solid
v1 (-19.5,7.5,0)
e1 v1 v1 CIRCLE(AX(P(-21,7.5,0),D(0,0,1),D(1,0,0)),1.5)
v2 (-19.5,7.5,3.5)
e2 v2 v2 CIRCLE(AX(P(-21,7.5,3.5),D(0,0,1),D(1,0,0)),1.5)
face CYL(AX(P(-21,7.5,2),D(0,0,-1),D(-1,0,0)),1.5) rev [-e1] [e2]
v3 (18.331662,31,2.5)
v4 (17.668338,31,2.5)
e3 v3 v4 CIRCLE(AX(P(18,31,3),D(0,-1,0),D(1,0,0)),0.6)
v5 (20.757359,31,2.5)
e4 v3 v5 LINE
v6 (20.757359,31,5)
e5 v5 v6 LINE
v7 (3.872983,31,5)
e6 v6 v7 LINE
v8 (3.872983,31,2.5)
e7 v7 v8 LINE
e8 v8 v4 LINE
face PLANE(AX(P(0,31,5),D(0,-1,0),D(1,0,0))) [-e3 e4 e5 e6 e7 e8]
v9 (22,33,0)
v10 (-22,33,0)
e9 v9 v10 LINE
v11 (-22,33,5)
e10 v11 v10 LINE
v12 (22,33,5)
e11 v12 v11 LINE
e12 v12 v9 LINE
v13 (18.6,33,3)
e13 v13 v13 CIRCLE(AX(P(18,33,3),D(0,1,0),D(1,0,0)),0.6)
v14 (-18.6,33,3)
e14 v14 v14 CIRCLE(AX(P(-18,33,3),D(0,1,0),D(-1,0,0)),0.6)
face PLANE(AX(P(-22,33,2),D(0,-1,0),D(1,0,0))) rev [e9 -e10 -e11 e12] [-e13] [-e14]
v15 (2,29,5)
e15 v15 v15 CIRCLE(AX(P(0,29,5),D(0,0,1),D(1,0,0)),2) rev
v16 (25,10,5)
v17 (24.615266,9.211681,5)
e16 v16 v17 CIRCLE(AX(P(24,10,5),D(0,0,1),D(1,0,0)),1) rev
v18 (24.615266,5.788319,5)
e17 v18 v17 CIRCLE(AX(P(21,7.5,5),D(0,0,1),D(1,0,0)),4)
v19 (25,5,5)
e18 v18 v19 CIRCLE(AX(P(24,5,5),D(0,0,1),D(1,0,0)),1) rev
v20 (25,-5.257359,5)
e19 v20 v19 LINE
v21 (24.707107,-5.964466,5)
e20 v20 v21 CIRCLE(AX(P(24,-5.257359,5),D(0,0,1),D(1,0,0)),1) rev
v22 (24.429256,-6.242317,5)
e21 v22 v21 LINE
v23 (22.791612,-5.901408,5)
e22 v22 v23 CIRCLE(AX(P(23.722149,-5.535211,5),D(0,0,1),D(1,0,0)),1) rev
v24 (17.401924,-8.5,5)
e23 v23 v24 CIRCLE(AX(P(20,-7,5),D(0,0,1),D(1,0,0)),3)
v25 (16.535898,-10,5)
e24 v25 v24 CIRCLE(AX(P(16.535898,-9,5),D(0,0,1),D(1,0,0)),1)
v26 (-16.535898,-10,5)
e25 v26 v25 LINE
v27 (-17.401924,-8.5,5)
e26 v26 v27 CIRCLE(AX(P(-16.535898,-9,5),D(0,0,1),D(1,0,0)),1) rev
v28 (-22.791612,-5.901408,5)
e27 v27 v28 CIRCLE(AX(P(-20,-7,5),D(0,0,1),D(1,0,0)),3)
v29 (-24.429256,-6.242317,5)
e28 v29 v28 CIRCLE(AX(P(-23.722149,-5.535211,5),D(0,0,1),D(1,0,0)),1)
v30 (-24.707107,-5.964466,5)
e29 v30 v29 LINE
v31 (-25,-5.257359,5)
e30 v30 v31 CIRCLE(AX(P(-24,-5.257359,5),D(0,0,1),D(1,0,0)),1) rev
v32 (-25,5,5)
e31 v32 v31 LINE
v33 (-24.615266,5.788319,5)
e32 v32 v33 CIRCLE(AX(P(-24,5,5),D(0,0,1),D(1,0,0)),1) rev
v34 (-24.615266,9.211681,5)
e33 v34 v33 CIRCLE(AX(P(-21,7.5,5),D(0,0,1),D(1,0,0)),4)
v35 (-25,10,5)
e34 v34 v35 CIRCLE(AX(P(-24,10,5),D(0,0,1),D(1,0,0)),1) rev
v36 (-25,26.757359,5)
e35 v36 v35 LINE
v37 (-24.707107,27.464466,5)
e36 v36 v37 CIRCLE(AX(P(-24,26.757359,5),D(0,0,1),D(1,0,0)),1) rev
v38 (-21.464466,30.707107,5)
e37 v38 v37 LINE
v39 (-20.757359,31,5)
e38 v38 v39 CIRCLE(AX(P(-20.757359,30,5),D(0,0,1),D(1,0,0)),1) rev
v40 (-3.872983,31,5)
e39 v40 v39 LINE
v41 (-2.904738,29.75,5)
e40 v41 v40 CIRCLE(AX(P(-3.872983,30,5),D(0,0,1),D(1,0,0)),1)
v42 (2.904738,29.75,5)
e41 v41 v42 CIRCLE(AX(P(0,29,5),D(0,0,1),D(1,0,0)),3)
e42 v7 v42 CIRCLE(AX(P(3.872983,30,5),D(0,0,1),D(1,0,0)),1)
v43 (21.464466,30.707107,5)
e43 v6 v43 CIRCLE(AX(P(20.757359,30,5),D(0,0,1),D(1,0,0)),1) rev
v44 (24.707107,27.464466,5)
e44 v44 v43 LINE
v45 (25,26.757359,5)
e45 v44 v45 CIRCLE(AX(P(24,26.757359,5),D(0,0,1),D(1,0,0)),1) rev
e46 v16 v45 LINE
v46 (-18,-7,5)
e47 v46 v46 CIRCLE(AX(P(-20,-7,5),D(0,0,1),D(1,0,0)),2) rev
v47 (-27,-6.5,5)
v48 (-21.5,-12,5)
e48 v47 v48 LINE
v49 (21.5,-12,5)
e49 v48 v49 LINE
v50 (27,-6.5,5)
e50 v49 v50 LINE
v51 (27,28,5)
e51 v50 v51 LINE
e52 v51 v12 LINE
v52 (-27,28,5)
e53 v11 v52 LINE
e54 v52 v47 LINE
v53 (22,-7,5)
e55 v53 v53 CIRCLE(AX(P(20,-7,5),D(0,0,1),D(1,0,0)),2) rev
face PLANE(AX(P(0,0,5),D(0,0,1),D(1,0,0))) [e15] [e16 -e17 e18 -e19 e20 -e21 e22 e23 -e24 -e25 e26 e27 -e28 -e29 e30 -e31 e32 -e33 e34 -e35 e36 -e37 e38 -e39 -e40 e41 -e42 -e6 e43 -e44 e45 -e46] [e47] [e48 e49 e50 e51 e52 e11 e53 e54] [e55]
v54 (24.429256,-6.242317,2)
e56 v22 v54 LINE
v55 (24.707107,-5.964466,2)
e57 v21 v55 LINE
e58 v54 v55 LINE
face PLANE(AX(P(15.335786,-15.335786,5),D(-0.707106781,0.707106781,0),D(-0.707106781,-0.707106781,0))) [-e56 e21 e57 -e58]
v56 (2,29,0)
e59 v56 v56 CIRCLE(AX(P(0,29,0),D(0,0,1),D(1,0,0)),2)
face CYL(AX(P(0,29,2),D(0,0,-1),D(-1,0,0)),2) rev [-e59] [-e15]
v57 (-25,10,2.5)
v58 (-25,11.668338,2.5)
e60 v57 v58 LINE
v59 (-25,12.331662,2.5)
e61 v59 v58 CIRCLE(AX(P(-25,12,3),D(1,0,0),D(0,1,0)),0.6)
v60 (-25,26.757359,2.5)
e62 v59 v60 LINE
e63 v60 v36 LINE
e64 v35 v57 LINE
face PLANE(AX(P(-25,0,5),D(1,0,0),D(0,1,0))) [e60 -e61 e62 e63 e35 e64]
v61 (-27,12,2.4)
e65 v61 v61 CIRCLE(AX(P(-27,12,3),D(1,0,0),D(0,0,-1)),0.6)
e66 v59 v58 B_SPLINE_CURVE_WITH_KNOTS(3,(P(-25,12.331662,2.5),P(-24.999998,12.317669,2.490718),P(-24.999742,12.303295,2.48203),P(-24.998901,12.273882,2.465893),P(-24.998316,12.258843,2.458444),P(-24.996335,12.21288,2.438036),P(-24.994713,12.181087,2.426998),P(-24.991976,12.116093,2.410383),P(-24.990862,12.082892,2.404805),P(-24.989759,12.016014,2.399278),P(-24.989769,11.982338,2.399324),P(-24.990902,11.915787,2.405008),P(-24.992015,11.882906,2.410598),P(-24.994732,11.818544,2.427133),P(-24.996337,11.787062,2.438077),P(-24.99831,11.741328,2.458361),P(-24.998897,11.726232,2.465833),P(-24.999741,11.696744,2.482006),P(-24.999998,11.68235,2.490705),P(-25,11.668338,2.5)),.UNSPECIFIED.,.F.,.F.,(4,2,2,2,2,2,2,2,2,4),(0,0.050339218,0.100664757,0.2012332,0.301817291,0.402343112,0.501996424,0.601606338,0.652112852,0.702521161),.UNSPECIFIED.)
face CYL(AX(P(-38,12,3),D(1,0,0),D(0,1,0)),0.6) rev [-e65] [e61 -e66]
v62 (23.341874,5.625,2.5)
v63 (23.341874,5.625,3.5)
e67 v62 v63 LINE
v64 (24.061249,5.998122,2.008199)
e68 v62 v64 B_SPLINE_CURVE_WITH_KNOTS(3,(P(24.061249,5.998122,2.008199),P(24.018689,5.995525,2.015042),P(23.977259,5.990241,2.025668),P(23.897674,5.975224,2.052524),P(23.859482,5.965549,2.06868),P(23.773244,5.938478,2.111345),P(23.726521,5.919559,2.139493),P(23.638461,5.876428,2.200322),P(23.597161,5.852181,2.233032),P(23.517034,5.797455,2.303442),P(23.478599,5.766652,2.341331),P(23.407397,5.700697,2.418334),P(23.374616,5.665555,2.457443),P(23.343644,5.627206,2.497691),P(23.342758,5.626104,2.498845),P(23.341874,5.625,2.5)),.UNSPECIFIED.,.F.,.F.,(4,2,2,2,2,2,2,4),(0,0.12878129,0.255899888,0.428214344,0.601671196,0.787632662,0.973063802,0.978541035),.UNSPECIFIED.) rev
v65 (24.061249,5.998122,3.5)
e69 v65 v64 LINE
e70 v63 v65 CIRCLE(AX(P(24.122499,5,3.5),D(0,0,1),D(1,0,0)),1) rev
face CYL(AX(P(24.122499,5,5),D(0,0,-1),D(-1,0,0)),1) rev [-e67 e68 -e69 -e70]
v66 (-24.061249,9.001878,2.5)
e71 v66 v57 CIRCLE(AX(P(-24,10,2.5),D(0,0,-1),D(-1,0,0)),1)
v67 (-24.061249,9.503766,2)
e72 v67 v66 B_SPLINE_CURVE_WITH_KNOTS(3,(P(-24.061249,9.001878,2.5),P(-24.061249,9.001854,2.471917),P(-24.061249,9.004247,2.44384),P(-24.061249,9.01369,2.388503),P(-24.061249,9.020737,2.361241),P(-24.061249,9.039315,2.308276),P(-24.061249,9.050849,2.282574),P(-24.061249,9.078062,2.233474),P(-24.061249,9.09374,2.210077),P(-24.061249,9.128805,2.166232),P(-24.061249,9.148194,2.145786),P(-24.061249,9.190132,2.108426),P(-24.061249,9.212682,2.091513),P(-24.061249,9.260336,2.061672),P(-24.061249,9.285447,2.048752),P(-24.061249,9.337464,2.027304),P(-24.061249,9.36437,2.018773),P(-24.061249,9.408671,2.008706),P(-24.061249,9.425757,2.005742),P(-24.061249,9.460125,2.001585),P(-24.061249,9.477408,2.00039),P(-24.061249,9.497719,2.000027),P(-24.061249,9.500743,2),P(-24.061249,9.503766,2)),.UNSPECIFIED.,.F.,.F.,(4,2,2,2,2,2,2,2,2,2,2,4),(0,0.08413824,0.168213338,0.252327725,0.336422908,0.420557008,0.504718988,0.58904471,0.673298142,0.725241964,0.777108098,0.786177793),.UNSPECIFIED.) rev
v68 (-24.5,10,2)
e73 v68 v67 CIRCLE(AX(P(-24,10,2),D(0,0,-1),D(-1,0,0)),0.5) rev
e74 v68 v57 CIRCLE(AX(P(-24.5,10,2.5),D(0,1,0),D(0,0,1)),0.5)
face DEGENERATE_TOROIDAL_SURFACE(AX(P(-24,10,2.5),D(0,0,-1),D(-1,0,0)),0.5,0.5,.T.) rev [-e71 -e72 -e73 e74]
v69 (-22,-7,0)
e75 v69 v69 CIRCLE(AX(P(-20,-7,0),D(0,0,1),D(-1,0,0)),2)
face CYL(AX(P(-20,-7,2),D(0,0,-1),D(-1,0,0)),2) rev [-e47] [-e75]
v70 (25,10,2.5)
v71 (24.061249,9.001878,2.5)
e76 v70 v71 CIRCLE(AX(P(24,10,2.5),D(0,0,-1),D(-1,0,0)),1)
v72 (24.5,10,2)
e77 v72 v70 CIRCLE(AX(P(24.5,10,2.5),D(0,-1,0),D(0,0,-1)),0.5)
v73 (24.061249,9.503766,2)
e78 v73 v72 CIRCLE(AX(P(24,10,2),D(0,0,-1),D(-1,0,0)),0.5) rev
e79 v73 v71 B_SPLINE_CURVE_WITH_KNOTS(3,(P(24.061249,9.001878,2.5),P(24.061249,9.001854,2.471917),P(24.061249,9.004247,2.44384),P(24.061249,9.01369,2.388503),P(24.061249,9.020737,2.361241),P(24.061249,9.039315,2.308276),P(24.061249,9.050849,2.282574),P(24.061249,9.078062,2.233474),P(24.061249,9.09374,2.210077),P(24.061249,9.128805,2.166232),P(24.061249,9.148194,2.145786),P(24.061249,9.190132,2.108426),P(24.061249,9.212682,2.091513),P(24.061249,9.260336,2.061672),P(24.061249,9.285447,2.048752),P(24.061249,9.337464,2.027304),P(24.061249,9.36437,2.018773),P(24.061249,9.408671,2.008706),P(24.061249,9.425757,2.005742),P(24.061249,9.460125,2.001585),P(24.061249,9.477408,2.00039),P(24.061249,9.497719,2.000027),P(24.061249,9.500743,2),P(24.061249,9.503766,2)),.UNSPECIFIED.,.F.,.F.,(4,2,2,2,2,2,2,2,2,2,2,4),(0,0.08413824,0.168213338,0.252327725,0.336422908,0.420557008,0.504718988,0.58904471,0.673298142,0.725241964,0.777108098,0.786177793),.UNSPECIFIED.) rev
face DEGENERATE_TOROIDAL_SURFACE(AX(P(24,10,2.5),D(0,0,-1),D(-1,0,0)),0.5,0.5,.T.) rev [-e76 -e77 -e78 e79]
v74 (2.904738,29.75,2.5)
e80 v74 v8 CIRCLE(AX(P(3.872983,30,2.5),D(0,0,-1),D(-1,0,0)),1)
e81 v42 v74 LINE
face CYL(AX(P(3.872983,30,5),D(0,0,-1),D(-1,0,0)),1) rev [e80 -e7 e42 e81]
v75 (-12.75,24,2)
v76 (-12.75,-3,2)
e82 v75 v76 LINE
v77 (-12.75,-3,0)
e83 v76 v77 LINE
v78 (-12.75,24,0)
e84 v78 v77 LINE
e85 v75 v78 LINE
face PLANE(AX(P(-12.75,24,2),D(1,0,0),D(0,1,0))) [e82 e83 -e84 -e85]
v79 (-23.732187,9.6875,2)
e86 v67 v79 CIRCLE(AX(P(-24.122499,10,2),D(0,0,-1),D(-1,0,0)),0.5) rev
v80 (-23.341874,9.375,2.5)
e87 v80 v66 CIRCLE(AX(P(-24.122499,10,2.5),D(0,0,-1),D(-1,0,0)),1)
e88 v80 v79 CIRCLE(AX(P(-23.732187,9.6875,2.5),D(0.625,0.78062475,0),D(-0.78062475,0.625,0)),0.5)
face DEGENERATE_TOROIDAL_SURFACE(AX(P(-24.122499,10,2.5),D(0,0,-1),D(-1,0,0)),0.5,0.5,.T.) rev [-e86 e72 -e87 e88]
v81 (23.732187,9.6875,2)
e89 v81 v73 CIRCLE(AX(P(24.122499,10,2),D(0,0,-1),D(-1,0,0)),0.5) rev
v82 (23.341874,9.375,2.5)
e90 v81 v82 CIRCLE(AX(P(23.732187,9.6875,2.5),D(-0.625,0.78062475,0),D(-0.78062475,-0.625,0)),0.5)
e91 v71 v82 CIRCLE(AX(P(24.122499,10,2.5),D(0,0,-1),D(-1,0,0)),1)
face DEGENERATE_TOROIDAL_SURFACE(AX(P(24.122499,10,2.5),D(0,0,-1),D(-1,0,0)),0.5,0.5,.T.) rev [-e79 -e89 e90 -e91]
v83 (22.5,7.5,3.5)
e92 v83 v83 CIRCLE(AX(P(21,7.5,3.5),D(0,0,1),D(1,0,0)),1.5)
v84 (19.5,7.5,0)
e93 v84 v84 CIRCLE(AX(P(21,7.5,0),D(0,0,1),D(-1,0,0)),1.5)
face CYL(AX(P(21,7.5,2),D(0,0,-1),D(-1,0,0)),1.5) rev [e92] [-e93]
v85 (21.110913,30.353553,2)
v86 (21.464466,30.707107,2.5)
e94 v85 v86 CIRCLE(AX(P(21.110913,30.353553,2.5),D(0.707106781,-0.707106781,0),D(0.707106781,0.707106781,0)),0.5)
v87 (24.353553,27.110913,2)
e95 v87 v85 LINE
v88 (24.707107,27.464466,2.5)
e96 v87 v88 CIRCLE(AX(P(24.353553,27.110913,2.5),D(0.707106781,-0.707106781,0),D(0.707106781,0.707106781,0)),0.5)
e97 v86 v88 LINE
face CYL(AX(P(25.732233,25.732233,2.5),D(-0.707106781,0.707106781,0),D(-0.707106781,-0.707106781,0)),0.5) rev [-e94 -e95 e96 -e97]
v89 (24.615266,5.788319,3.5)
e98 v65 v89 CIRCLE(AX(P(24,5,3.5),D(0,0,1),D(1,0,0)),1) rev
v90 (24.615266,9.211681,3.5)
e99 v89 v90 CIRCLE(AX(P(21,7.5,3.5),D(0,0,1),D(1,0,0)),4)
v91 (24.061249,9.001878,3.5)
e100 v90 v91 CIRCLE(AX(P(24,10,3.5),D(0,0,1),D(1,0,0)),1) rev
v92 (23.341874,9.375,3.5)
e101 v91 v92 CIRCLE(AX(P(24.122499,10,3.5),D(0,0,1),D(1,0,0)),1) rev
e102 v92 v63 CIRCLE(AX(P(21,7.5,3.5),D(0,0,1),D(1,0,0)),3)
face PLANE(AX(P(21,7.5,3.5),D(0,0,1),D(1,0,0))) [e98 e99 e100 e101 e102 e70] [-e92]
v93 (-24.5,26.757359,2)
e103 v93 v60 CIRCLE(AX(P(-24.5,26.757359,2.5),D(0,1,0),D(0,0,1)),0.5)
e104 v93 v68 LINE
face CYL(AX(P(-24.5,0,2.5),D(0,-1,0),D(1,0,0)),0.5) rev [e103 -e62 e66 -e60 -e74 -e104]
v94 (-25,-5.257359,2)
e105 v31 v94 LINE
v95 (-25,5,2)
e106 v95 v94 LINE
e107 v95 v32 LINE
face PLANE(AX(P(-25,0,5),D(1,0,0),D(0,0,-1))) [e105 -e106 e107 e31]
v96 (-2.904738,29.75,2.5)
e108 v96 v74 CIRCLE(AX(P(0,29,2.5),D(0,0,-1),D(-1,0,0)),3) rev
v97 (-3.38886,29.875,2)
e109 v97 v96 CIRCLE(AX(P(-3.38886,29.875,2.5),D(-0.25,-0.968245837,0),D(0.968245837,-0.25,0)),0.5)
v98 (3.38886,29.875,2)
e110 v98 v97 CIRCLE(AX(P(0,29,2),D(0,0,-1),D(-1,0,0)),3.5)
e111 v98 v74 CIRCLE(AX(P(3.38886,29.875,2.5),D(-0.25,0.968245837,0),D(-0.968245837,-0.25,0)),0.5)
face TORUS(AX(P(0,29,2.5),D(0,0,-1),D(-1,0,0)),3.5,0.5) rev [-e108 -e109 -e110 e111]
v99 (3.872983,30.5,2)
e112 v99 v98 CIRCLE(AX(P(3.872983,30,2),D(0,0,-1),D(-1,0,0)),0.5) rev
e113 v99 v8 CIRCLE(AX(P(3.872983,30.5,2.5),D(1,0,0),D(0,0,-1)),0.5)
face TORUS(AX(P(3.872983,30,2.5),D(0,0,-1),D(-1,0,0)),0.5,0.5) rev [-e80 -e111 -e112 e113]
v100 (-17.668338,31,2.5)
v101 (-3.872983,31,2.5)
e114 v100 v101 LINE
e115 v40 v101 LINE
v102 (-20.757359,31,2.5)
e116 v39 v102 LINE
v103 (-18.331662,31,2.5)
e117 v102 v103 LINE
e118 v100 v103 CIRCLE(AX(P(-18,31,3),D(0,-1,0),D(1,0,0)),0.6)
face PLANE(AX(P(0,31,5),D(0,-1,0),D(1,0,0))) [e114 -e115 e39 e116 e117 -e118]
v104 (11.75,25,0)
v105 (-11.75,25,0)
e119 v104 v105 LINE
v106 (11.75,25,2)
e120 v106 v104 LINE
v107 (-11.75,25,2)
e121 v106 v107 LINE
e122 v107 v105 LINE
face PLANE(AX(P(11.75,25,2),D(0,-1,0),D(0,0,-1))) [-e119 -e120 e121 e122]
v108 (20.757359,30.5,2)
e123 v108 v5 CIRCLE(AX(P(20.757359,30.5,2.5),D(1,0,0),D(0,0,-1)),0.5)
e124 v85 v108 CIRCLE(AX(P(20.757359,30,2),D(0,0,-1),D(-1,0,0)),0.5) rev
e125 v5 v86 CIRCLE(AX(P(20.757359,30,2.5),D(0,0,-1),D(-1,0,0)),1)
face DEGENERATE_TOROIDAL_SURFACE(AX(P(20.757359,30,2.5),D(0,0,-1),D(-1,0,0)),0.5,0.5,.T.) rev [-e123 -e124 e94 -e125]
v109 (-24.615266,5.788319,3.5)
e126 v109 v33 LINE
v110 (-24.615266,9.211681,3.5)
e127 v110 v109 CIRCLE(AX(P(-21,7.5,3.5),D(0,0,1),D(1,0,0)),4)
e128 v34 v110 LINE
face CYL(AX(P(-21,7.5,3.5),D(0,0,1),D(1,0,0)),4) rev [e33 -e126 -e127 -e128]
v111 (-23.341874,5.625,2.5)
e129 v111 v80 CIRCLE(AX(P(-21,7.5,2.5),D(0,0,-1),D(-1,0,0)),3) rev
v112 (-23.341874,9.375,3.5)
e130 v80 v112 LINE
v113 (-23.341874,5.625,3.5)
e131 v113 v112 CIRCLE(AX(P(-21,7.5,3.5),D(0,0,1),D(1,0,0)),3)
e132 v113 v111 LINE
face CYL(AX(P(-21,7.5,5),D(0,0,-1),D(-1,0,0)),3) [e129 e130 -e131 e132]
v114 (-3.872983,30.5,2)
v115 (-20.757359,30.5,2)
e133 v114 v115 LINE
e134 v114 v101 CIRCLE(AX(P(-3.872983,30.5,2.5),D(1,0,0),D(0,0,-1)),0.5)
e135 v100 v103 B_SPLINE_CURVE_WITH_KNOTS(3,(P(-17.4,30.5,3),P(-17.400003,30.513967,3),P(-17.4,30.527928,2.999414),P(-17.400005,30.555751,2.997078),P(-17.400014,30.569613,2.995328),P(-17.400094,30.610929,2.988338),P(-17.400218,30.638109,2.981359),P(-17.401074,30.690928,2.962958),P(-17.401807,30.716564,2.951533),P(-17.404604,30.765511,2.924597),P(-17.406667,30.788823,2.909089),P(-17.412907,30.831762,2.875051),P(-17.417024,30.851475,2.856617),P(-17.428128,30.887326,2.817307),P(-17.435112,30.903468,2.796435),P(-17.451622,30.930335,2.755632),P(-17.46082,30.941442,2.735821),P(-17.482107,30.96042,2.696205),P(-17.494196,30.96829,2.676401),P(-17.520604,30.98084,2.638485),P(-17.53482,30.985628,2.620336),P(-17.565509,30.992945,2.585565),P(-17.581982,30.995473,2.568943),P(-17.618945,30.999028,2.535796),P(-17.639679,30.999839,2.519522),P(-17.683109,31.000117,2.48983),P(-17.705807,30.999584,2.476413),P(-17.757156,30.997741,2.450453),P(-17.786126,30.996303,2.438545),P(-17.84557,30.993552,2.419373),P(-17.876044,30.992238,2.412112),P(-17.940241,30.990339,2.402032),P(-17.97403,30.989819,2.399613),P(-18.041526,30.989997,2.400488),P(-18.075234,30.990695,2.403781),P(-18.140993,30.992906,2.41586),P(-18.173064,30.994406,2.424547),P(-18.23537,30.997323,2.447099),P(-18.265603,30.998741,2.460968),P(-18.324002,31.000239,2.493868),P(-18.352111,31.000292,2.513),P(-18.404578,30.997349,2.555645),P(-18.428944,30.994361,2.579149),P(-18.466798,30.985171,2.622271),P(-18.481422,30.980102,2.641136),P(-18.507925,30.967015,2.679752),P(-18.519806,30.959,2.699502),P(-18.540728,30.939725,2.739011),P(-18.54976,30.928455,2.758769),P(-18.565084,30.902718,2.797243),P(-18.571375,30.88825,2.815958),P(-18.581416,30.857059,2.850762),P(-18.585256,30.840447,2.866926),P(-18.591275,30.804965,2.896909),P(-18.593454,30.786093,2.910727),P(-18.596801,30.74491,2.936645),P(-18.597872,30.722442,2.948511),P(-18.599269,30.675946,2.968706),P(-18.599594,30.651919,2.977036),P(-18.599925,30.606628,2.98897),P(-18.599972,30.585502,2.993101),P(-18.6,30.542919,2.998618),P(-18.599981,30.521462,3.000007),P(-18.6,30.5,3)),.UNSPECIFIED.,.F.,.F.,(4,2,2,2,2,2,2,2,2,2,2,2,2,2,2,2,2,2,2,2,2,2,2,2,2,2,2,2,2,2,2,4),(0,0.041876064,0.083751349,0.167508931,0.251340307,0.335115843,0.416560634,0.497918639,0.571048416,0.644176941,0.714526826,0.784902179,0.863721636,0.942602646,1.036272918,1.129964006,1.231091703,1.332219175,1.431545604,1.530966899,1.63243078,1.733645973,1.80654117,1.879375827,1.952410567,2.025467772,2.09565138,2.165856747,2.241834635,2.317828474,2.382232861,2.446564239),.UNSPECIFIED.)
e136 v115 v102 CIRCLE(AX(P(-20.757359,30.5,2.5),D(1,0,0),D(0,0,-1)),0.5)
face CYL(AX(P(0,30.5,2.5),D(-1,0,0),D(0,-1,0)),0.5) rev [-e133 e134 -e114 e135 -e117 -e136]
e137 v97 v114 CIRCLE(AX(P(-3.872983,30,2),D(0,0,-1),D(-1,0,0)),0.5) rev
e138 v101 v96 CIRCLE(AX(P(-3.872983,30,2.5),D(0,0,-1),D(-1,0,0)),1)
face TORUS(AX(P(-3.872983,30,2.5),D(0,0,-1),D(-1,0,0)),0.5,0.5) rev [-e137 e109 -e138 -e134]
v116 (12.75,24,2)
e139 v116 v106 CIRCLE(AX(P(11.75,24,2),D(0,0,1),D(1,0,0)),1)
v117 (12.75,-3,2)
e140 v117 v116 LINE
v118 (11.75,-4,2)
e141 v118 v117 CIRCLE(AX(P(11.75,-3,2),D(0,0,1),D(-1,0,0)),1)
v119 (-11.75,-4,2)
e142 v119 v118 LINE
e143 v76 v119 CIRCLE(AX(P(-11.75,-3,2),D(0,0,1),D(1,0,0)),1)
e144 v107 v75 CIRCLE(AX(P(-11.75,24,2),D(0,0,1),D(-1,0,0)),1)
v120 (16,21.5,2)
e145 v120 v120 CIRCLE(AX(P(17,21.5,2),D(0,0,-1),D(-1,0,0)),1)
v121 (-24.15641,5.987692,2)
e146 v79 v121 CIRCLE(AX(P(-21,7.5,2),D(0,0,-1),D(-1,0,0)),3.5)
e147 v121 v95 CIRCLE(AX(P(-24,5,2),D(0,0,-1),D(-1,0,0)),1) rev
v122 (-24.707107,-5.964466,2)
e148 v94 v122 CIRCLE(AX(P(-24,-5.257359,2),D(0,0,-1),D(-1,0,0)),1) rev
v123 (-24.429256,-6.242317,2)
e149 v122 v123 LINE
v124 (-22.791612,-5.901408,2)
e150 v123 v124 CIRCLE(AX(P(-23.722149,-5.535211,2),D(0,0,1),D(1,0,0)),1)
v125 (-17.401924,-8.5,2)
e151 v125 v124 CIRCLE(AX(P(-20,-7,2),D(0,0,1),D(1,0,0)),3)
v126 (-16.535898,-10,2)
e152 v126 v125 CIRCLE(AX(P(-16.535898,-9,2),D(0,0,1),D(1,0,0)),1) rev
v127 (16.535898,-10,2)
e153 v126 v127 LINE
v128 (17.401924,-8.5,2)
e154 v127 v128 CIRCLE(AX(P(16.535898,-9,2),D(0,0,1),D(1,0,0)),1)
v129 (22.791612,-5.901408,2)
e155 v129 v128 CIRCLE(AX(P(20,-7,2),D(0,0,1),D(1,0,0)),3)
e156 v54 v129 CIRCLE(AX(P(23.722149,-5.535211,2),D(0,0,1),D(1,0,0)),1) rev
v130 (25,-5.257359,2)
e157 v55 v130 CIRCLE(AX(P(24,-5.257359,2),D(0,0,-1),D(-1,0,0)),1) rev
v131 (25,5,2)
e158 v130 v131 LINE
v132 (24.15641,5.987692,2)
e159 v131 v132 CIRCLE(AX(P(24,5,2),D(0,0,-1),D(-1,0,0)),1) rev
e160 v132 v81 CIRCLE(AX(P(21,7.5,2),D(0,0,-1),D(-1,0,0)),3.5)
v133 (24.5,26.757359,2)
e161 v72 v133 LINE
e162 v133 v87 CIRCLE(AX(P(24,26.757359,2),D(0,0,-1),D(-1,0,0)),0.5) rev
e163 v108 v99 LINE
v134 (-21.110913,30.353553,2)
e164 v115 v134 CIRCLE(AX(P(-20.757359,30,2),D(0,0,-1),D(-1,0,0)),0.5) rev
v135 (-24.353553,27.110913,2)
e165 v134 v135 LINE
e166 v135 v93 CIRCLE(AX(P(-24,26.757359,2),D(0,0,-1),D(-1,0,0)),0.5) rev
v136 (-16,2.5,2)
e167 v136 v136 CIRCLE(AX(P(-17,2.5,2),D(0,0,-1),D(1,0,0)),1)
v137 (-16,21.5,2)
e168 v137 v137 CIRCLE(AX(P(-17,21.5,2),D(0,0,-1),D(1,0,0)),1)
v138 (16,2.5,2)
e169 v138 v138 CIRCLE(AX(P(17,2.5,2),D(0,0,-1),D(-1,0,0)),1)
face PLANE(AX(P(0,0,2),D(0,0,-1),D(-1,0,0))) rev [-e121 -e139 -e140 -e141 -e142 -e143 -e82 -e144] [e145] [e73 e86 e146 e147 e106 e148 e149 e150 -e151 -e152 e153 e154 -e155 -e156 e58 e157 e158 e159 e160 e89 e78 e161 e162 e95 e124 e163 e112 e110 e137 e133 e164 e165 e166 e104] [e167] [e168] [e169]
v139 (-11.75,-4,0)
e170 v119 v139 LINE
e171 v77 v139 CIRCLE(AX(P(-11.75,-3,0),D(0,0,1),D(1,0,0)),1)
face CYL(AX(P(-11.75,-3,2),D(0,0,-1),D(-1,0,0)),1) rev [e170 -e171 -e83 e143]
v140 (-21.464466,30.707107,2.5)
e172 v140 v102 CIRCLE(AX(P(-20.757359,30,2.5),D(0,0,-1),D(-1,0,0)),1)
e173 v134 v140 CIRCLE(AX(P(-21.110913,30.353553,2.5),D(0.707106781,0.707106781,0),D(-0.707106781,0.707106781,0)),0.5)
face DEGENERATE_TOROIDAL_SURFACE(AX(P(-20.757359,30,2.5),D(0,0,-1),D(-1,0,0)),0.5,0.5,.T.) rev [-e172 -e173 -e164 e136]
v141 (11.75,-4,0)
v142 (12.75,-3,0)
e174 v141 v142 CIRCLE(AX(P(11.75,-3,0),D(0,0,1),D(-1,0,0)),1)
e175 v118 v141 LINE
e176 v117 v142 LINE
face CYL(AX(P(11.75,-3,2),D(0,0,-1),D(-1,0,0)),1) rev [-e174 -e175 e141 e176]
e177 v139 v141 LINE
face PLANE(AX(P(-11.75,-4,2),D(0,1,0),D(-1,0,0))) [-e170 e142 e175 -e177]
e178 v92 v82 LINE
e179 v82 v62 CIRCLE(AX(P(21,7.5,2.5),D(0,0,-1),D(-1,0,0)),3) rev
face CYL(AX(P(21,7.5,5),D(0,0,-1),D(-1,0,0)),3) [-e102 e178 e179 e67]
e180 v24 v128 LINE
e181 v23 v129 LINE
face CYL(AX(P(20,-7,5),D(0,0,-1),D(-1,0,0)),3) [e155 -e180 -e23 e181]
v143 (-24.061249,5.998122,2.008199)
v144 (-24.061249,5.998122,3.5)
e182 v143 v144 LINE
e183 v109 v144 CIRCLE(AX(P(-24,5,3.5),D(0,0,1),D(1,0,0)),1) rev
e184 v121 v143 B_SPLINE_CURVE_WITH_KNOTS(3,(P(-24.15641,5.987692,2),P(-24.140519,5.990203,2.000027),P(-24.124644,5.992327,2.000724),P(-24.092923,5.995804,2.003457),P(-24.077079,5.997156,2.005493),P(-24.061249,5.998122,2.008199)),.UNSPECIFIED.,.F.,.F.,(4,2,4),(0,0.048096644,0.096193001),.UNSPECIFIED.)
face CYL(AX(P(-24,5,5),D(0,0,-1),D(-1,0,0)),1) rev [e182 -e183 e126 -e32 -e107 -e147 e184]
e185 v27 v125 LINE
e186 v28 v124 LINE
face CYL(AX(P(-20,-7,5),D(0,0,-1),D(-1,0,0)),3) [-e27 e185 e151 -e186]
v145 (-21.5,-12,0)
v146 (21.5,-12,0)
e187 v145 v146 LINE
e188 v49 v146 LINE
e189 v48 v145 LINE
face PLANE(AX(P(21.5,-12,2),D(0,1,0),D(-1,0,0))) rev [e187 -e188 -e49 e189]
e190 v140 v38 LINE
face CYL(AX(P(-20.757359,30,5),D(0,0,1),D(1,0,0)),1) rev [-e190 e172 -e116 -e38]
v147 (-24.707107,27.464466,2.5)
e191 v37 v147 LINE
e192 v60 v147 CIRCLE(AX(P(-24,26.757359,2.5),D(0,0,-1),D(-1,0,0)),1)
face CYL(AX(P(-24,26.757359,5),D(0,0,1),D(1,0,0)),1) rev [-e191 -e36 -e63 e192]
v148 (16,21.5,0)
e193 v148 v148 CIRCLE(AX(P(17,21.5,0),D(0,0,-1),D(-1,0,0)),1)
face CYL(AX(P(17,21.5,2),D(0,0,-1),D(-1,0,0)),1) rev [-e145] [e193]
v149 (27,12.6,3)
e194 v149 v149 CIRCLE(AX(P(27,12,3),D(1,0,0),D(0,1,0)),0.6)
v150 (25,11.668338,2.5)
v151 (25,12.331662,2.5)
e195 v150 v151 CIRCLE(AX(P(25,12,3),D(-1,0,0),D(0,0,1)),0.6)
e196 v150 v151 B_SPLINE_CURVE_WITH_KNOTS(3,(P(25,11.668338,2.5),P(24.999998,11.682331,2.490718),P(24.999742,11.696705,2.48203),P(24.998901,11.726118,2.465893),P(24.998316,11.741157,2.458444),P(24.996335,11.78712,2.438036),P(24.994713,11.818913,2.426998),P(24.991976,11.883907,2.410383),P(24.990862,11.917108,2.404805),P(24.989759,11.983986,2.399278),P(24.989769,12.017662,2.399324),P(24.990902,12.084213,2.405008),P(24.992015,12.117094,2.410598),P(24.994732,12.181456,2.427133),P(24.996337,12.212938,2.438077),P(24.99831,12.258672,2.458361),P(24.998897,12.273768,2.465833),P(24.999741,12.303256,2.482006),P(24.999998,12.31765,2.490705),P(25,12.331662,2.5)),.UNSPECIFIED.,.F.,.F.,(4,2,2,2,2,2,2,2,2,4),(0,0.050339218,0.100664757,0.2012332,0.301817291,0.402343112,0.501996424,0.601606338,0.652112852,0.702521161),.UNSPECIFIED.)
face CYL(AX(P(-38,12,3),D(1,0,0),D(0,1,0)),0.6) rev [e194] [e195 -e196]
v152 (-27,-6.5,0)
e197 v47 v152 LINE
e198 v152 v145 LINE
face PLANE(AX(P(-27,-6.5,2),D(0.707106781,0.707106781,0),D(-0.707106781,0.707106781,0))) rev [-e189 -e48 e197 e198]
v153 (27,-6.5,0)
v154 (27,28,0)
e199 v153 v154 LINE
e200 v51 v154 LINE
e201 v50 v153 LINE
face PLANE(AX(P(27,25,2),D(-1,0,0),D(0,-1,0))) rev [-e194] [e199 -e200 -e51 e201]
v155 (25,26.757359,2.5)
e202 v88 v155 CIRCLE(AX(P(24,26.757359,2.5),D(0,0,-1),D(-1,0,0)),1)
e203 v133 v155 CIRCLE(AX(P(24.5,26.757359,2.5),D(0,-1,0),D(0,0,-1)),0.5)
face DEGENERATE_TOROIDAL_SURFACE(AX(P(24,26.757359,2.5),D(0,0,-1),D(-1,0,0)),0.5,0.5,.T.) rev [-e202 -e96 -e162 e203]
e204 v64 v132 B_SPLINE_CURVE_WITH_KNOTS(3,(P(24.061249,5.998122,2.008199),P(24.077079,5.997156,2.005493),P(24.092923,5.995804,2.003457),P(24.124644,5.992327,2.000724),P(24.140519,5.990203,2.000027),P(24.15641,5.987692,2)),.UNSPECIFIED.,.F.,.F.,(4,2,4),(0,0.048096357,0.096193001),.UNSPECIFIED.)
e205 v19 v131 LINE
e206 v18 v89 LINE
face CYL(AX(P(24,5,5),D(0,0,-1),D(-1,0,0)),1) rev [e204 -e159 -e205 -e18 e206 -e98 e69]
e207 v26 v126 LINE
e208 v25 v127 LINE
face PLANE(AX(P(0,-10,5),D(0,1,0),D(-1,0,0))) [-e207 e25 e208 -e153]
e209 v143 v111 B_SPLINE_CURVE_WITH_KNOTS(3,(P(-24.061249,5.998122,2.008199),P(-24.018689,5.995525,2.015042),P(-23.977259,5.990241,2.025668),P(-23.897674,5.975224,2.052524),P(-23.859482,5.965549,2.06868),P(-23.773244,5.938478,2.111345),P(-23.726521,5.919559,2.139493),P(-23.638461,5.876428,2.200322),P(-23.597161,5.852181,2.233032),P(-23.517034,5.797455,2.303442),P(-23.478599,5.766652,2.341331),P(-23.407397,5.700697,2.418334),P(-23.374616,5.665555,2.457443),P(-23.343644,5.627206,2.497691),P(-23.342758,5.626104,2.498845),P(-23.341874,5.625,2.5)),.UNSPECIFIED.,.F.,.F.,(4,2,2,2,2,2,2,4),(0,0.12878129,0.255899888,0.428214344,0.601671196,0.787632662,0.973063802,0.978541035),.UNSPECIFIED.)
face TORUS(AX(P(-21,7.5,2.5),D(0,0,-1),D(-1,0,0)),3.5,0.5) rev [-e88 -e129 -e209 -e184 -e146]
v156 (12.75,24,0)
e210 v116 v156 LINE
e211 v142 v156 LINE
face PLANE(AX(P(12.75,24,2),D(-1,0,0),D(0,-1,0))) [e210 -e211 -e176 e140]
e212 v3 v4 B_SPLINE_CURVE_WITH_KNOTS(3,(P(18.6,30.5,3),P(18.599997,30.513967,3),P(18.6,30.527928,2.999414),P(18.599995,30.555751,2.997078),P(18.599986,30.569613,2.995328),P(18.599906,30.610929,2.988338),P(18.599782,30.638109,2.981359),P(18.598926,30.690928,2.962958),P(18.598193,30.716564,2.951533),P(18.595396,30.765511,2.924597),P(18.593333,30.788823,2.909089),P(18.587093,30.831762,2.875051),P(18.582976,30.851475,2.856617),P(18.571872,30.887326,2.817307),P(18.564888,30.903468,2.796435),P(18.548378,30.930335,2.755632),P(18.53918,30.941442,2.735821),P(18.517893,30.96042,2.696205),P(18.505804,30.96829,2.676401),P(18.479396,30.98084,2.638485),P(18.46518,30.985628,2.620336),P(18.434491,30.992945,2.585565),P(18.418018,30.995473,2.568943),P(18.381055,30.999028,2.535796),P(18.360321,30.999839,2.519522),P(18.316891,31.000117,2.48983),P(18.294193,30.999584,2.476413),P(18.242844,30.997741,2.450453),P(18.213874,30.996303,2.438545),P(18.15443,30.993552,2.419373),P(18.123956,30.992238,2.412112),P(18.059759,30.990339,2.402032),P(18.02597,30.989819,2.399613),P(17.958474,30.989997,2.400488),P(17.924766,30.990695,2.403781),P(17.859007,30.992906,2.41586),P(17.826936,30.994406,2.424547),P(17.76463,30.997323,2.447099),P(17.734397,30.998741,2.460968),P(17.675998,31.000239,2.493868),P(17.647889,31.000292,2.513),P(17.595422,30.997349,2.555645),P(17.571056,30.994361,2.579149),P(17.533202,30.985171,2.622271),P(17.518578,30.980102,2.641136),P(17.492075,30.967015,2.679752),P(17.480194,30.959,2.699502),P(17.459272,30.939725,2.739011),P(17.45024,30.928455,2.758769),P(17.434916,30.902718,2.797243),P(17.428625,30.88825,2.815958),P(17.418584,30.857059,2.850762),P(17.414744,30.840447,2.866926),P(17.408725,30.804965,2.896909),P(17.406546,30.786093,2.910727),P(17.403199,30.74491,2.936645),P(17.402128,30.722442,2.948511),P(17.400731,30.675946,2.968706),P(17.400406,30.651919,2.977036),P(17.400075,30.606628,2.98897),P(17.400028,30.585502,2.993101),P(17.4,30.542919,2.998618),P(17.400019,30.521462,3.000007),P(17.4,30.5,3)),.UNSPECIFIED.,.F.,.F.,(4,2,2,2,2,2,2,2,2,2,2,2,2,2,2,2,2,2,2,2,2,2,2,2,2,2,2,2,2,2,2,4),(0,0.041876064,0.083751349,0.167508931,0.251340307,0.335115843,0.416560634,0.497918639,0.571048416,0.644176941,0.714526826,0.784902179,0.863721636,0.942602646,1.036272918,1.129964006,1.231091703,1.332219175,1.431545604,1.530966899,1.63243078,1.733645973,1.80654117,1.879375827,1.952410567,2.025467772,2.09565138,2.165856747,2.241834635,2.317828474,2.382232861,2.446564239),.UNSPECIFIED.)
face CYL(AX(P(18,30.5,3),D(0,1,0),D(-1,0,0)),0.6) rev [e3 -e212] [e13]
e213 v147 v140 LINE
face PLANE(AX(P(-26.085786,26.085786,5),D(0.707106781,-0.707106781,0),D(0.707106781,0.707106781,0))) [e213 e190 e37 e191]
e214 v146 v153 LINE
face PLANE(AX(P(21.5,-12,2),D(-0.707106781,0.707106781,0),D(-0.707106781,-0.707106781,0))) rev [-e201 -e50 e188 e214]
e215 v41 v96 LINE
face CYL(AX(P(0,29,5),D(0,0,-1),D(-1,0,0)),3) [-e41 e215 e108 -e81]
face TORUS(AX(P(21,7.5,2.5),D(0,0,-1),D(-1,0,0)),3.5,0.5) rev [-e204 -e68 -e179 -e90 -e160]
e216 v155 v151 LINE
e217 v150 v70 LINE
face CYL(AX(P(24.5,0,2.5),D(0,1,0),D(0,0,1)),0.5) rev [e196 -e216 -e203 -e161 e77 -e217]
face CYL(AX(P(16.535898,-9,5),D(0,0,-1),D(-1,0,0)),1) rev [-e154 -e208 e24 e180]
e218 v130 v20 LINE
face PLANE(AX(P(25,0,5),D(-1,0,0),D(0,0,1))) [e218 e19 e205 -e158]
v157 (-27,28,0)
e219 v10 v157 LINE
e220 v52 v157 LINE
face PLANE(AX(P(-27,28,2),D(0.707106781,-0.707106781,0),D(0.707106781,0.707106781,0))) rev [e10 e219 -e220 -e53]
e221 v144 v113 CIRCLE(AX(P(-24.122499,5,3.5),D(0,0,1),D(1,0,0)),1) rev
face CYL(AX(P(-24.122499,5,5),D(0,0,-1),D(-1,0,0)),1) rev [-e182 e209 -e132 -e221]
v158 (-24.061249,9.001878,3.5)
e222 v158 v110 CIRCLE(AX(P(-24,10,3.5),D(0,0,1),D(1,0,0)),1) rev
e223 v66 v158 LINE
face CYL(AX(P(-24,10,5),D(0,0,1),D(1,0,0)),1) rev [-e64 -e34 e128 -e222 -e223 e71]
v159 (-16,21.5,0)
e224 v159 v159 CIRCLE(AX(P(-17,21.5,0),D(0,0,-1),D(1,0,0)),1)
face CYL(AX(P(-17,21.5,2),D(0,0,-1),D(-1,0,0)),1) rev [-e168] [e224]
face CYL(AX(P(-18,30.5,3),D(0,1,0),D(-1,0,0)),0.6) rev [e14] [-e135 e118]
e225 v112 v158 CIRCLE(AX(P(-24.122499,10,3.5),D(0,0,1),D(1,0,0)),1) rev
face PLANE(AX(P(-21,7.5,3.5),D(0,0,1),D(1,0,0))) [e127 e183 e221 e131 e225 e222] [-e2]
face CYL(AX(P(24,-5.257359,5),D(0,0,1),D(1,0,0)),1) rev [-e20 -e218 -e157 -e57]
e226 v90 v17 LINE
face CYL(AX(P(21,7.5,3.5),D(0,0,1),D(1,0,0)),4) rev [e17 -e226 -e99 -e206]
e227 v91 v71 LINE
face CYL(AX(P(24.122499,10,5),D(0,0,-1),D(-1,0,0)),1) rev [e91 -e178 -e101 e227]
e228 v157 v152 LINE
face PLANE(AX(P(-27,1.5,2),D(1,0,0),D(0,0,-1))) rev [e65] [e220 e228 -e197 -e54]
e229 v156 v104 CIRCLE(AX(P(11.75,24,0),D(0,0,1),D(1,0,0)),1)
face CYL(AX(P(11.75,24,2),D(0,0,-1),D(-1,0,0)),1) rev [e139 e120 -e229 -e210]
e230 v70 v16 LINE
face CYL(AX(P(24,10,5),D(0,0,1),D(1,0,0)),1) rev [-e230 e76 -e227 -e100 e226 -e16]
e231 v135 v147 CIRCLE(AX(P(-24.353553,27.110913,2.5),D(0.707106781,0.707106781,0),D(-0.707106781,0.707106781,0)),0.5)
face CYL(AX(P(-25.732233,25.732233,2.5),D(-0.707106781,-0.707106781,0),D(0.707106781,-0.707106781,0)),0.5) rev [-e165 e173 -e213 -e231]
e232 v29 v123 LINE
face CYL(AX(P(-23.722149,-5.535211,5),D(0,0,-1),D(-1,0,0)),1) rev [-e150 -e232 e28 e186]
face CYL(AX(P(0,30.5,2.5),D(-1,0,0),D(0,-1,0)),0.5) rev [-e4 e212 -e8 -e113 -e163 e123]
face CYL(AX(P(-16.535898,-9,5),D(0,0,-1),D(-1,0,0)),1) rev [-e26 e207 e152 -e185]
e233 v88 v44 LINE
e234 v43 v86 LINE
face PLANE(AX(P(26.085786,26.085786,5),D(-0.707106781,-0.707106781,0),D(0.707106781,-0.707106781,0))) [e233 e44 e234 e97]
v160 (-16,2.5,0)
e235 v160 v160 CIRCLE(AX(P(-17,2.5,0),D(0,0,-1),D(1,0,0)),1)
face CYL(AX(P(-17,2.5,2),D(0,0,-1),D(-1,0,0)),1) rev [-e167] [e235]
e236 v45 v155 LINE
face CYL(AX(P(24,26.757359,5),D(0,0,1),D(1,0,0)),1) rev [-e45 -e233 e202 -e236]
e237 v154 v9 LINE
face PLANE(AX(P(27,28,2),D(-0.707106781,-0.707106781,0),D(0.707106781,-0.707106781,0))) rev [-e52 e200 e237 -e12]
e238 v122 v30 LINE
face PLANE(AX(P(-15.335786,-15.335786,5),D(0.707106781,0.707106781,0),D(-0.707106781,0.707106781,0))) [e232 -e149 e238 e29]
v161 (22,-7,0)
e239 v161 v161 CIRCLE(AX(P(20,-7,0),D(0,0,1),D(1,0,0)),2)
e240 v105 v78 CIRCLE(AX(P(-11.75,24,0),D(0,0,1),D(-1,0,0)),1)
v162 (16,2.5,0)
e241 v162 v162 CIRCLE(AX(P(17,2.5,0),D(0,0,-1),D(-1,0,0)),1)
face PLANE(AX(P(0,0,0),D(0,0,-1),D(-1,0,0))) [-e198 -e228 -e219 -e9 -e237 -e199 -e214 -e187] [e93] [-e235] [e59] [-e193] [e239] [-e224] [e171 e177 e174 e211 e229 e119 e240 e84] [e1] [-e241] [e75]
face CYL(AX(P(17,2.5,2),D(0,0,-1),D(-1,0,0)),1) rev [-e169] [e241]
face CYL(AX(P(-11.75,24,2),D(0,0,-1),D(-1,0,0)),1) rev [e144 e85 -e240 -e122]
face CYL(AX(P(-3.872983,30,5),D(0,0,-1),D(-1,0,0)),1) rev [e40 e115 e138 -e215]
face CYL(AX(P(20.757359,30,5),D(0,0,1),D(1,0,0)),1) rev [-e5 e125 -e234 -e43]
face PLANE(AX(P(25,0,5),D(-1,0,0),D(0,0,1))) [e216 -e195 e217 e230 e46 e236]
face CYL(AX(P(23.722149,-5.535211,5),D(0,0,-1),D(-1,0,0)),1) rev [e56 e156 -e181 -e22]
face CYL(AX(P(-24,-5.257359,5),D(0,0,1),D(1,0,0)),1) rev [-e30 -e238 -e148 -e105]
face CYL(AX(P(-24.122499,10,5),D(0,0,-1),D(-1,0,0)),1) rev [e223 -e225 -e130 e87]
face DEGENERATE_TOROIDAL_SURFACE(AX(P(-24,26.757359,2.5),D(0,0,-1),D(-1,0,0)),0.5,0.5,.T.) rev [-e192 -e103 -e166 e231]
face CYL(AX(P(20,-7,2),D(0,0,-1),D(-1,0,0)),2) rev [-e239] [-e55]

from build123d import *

# Parameters (mm, degrees)
SKETCH_1_R                = 2
SKETCH_1_R_2              = 1.5
EXTRUDE_1_DEPTH           = 2
BOSS_EXTRUDE1_OUTLINE_R   = 2
BOSS_EXTRUDE1_OUTLINE_R_2 = 1.5
BOSS_EXTRUDE1_DEPTH       = 3
SKETCH3_R                 = 1
CUT_EXTRUDE2_DEPTH        = 2
FILLET2_R                 = 1
FILLET3_R                 = 0.5
SKETCH4_R                 = 4
CUT_EXTRUDE3_DEPTH        = 1.5
SKETCH5_R                 = 0.6
CUT_EXTRUDE4_DEPTH        = 2.5
SKETCH6_R                 = 0.6
CUT_EXTRUDE5_DEPTH        = 65


# Read off the part's stored shape, not the designer's step: Boss-Extrude1
with BuildPart() as part:
    # 草图1 → 凸台-拉伸1 (new body)
    with BuildSketch(Plane.XY):
        Polygon((-27, 1.5), (-27, -6.5), (-21.5, -12), (-15.5, -12), (15.5, -12), (21.5, -12), (27, -6.5), (27, 1.5), (27, 25), (27, 28), (22, 33), (-22, 33), (-27, 28), (-27, 25), align=None)
        with Locations((20, -7)):
            Circle(SKETCH_1_R, mode=Mode.SUBTRACT)
        with Locations((0, 29)):
            Circle(SKETCH_1_R, mode=Mode.SUBTRACT)
        with Locations(Location((-20, -7, 0), (0, 0, 180))):
            Circle(SKETCH_1_R, mode=Mode.SUBTRACT)
        with Locations((-21, 7.5)):
            Circle(SKETCH_1_R_2, mode=Mode.SUBTRACT)
        with Locations(Location((21, 7.5, 0), (0, 0, 180))):
            Circle(SKETCH_1_R_2, mode=Mode.SUBTRACT)
        with BuildLine():
            Line((-12.75, 24), (-12.75, -3))
            ThreePointArc((-12.75, -3), (-12.457106781, -3.707106781), (-11.75, -4))
            Line((-11.75, -4), (11.75, -4))
            ThreePointArc((11.75, -4), (12.457106781, -3.707106781), (12.75, -3))
            Line((12.75, -3), (12.75, 24))
            ThreePointArc((12.75, 24), (12.457106781, 24.707106781), (11.75, 25))
            Line((11.75, 25), (-11.75, 25))
            ThreePointArc((-11.75, 25), (-12.457106781, 24.707106781), (-12.75, 24))
        make_face(mode=Mode.SUBTRACT)
    extrude(amount=EXTRUDE_1_DEPTH)

    # Boss-Extrude1 outline → Boss-Extrude1 (add)
    with BuildSketch(Plane.XY.offset(2)):
        Polygon((-21.5, -12), (21.5, -12), (27, -6.5), (27, 28), (22, 33), (-22, 33), (-27, 28), (-27, -6.5), align=None)
        with Locations((-20, -7)):
            Circle(BOSS_EXTRUDE1_OUTLINE_R, mode=Mode.SUBTRACT)
        with Locations((-21, 7.5)):
            Circle(BOSS_EXTRUDE1_OUTLINE_R_2, mode=Mode.SUBTRACT)
        with Locations((20, -7)):
            Circle(BOSS_EXTRUDE1_OUTLINE_R, mode=Mode.SUBTRACT)
        with Locations((21, 7.5)):
            Circle(BOSS_EXTRUDE1_OUTLINE_R_2, mode=Mode.SUBTRACT)
        with BuildLine():
            Line((25, 6), (25, -5.671572875))
            Line((25, -5.671572875), (24.429255588, -6.242317287))
            ThreePointArc((24.429255588, -6.242317287), (23.518347202, -6.514222715), (22.791611605, -5.90140788))
            ThreePointArc((22.791611605, -5.90140788), (18.697105438, -4.297692512), (17.401923789, -8.5))
            ThreePointArc((17.401923789, -8.5), (17.401923789, -9.5), (16.535898385, -10))
            Line((16.535898385, -10), (-16.535898385, -10))
            ThreePointArc((-16.535898385, -10), (-17.401923789, -9.5), (-17.401923789, -8.5))
            ThreePointArc((-17.401923789, -8.5), (-18.697105438, -4.297692512), (-22.791611605, -5.90140788))
            ThreePointArc((-22.791611605, -5.90140788), (-23.518347202, -6.514222715), (-24.429255588, -6.242317287))
            Line((-24.429255588, -6.242317287), (-25, -5.671572875))
            Line((-25, -5.671572875), (-25, 6))
            Line((-25, 6), (-23.598076211, 6))
            ThreePointArc((-23.598076211, 6), (-18, 7.5), (-23.598076211, 9))
            Line((-23.598076211, 9), (-25, 9))
            Line((-25, 9), (-25, 27.171572875))
            Line((-25, 27.171572875), (-21.171572875, 31))
            Line((-21.171572875, 31), (-3.872983346, 31))
            ThreePointArc((-3.872983346, 31), (-3.082413931, 30.612372436), (-2.90473751, 29.75))
            ThreePointArc((-2.90473751, 29.75), (0, 26), (2.90473751, 29.75))
            ThreePointArc((2.90473751, 29.75), (3.082413931, 30.612372436), (3.872983346, 31))
            Line((3.872983346, 31), (21.171572875, 31))
            Line((21.171572875, 31), (25, 27.171572875))
            Line((25, 27.171572875), (25, 9))
            Line((25, 9), (23.598076211, 9))
            ThreePointArc((23.598076211, 9), (18, 7.5), (23.598076211, 6))
            Line((23.598076211, 6), (25, 6))
        make_face(mode=Mode.SUBTRACT)
        with Locations((0, 29)):
            Circle(BOSS_EXTRUDE1_OUTLINE_R, mode=Mode.SUBTRACT)
    extrude(amount=BOSS_EXTRUDE1_DEPTH)

    # Sketch3 → Cut-Extrude2 (cut)
    with BuildSketch(Plane(origin=(0, 0, 0), x_dir=(-1, 0, 0), z_dir=(0, 0, -1))):
        with Locations((-17, 21.5)):
            Circle(SKETCH3_R)
        with Locations((-17, 2.5)):
            Circle(SKETCH3_R)
        with Locations(Location((17, 2.5, 0), (0, 0, 180))):
            Circle(SKETCH3_R)
        with Locations(Location((17, 21.5, 0), (0, 0, 180))):
            Circle(SKETCH3_R)
    extrude(amount=-CUT_EXTRUDE2_DEPTH, mode=Mode.SUBTRACT)

    # Fillet2
    # the kernel refuses this fillet: 1 mm, written as the material it adds along each edge
    with BuildSketch(Plane(origin=(25, -5.671572875, 0.964466094), x_dir=(0, 1, 0), z_dir=(0, 0, 1)), Plane(origin=(21.171572875, 31, 0.964466094), x_dir=(-1, 0, 0), z_dir=(0, 0, 1)), Plane(origin=(-25, 27.171572875, 0.964466094), x_dir=(0, -1, 0), z_dir=(0, 0, 1)), Plane(origin=(-21.171572875, 31, 0.964466094), x_dir=(-0.7071067811865432, -0.7071067811865518, 0), z_dir=(0, 0, 1)), Plane(origin=(-25, -5.671572875, 0.964466094), x_dir=(0.7071067811865432, -0.7071067811865518, 0), z_dir=(0, 0, 1)), Plane(origin=(25, 27.171572875, 0.964466094), x_dir=(-0.7071067811865475, 0.7071067811865475, 0), z_dir=(0, 0, 1))) as fillet2_piece_1:
        with BuildLine():
            CenterArc((FILLET2_R * 0.414213562373, FILLET2_R), FILLET2_R, 225, 45)
            Line((-FILLET2_R * 0.292893218813, FILLET2_R * 0.292893218813), (0, 0))
            Line((0, 0), (FILLET2_R * 0.414213562373, 0))
        make_face()
    extrude(amount=4.035533906)
    with BuildSketch(Plane(origin=(23.598076211, 9, 0.68894303), x_dir=(1, 0, 0), z_dir=(0, 0, 1)), Plane(origin=(-23.598076211, 6, 0.68894303), x_dir=(-1, 0, 0), z_dir=(0, 0, 1))) as fillet2_piece_2:
        with BuildLine():
            CenterArc((0.524422788, 1), FILLET2_R, 218.682187455, 51.317812545)
            ThreePointArc((-0.256201962, 0.375), (-0.120994483, 0.192355197), (0, 0))
            Line((0, 0), (0.524422788, 0))
        make_face()
    extrude(amount=4.31105697)
    with BuildSketch(Plane(origin=(25, 9, 2), x_dir=(0, 1, 0), z_dir=(0, 0, 1)), Plane(origin=(25, 6, 2), x_dir=(-1, 0, 0), z_dir=(0, 0, 1)), Plane(origin=(-25, 6, 2), x_dir=(0, -1, 0), z_dir=(0, 0, 1)), Plane(origin=(-25, 9, 2), x_dir=(1, 0, 0), z_dir=(0, 0, 1))) as fillet2_piece_3:
        with BuildLine():
            CenterArc((FILLET2_R, FILLET2_R), FILLET2_R, 180, 90)
            Line((0, FILLET2_R), (0, 0))
            Line((0, 0), (FILLET2_R, 0))
        make_face()
    extrude(amount=3)
    with BuildSketch(Plane(origin=(23.598076211, 6, 0.68894303), x_dir=(1, 0, 0), z_dir=(0, 0, 1))) as fillet2_piece_4:
        with BuildLine():
            CenterArc((0.524422788, -1), FILLET2_R, 90, 51.317812545)
            ThreePointArc((-0.256201962, -0.375), (-0.120994483, -0.192355197), (0, 0))
            Line((0, 0), (0.524422788, 0))
        make_face()
    extrude(amount=4.31105697)
    with BuildSketch(Plane(origin=(-23.598076211, 9, 0.68894303), x_dir=(0.5641183988802636, 0.8256939094148436, 0), z_dir=(0, 0, 1))) as fillet2_piece_5:
        with BuildLine():
            CenterArc((0.529857366, 0.997131101), FILLET2_R, 214.341093729, 51.317812545)
            Line((-0.295836543, 0.433012702), (0, 0))
            ThreePointArc((0, 0), (0.227081728, 0.008606698), (0.454163457, 0))
        make_face()
    extrude(amount=4.31105697)

    # Fillet3
    # the kernel refuses this fillet: 0.5 mm, written as the material it adds along each edge
    with BuildSketch(Plane(origin=(20.757359313, 30, 2), x_dir=(0, 1, 0), z_dir=(-1, 0, 0))) as fillet3_piece_1:
        with BuildLine():
            CenterArc((1 - FILLET3_R, -FILLET3_R), FILLET3_R, 0, 90)
            Line((1 - FILLET3_R, 0), (1, 0))
            Line((1, 0), (1, -FILLET3_R))
        make_face()
    revolve(axis=Axis((20.757359313, 30, 2), (0, 0, -1)), revolution_arc=45)
    with BuildSketch(Plane(origin=(21.464466094, 30.707106781, 2), x_dir=(0, 0, 1), z_dir=(0.7071067811865476, -0.7071067811865476, 0)), Plane(origin=(-24.707106781, 27.464466094, 2), x_dir=(0, 0, 1), z_dir=(0.7071067811865476, 0.7071067811865476, 0))) as fillet3_piece_2:
        with BuildLine():
            CenterArc((FILLET3_R, FILLET3_R), FILLET3_R, 180, 90)
            Line((0, FILLET3_R), (0, 0))
            Line((0, 0), (FILLET3_R, 0))
        make_face()
    extrude(amount=4.585786438)
    with BuildSketch(Plane(origin=(-25, 10, 2), x_dir=(0, 0, 1), z_dir=(0, 1, 0)), Plane(origin=(25, 26.757359313, 2), x_dir=(0, 0, 1), z_dir=(0, -1, 0))) as fillet3_piece_3:
        with BuildLine():
            CenterArc((FILLET3_R, FILLET3_R), FILLET3_R, 180, 90)
            Line((0, FILLET3_R), (0, 0))
            Line((0, 0), (FILLET3_R, 0))
        make_face()
    extrude(amount=16.757359313)
    with BuildSketch(Plane(origin=(-24, 26.757359313, 2), x_dir=(-1, 0, 0), z_dir=(0, -1, 0))) as fillet3_piece_4:
        with BuildLine():
            CenterArc((1 - FILLET3_R, -FILLET3_R), FILLET3_R, 0, 90)
            Line((1 - FILLET3_R, 0), (1, 0))
            Line((1, 0), (1, -FILLET3_R))
        make_face()
    revolve(axis=Axis((-24, 26.757359313, 2), (0, 0, -1)), revolution_arc=45)
    with BuildSketch(Plane(origin=(-20.757359313, 30, 2), x_dir=(-0.7071067811865476, 0.7071067811865476, 0), z_dir=(-0.7071067811865476, -0.7071067811865476, 0))) as fillet3_piece_5:
        with BuildLine():
            CenterArc((1 - FILLET3_R, -FILLET3_R), FILLET3_R, 0, 90)
            Line((1 - FILLET3_R, 0), (1, 0))
            Line((1, 0), (1, -FILLET3_R))
        make_face()
    revolve(axis=Axis((-20.757359313, 30, 2), (0, 0, -1)), revolution_arc=45)
    with BuildSketch(Plane(origin=(-20.757359313, 31, 2), x_dir=(0, 0, 1), z_dir=(1, 0, 0)), Plane(origin=(3.872983346, 31, 2), x_dir=(0, 0, 1), z_dir=(1, 0, 0))) as fillet3_piece_6:
        with BuildLine():
            CenterArc((FILLET3_R, FILLET3_R), FILLET3_R, 180, 90)
            Line((0, FILLET3_R), (0, 0))
            Line((0, 0), (FILLET3_R, 0))
        make_face()
    extrude(amount=16.884375967)
    with BuildSketch(Plane(origin=(-3.872983345, 30.000000001, 2), x_dir=(-6.500027189216223e-10, 1.0, 0), z_dir=(-1.0, -6.500027189216223e-10, 0))) as fillet3_piece_7:
        with BuildLine():
            CenterArc((0.999999999 - FILLET3_R, -FILLET3_R), FILLET3_R, 0, 90)
            Line((0.999999999 - FILLET3_R, 0), (0.999999999, 0))
            Line((0.999999999, 0), (0.999999999, -FILLET3_R))
        make_face()
    revolve(axis=Axis((-3.872983345, 30.000000001, 2), (0, 0, -1)), revolution_arc=104.477512292)
    with BuildSketch(Plane(origin=(0, 29, 2), x_dir=(-0.9682458365805575, 0.24999999988883273, 0), z_dir=(0.24999999988883273, 0.9682458365805575, 0))) as fillet3_piece_8:
        with BuildLine():
            CenterArc((3 + FILLET3_R, FILLET3_R), FILLET3_R, 180, 90)
            Line((3 + FILLET3_R, 0), (3, 0))
            Line((3, 0), (3, FILLET3_R))
        make_face()
    revolve(axis=Axis((0, 29, 2), (0, 0, 1)), revolution_arc=208.955024359)
    with BuildSketch(Plane(origin=(3.872983345, 30.000000001, 2), x_dir=(-0.9682458362513904, -0.2500000011636916, 0), z_dir=(0.2500000011636916, -0.9682458362513904, 0))) as fillet3_piece_9:
        with BuildLine():
            CenterArc((0.999999999 - FILLET3_R, -FILLET3_R), FILLET3_R, 0, 90)
            Line((0.999999999 - FILLET3_R, 0), (0.999999999, 0))
            Line((0.999999999, 0), (0.999999999, -FILLET3_R))
        make_face()
    revolve(axis=Axis((3.872983345, 30.000000001, 2), (0, 0, -1)), revolution_arc=104.477512292)
    with BuildSketch(Plane(origin=(-21, 7.5, 2), x_dir=(-0.9672051356057111, -0.2539965071766504, 0), z_dir=(-0.2539965071766504, 0.9672051356057111, 0))) as fillet3_piece_10:
        with BuildLine():
            CenterArc((3 + FILLET3_R, FILLET3_R), FILLET3_R, 180, 90)
            Line((3 + FILLET3_R, 0), (3, 0))
            Line((3, 0), (3, FILLET3_R))
        make_face()
    revolve(axis=Axis((-21, 7.5, 2), (0, 0, 1)), revolution_arc=306.603680913)
    with BuildSketch(Plane(origin=(21, 7.5, 2), x_dir=(0.780624749779316, 0.6250000000255845, 0), z_dir=(0.6250000000255845, -0.780624749779316, 0))) as fillet3_piece_11:
        with BuildLine():
            CenterArc((3 + FILLET3_R, FILLET3_R), FILLET3_R, 180, 90)
            Line((3 + FILLET3_R, 0), (3, 0))
            Line((3, 0), (3, FILLET3_R))
        make_face()
    revolve(axis=Axis((21, 7.5, 2), (0, 0, 1)), revolution_arc=306.603680913)
    with BuildSketch(Plane(origin=(24, 10, 2), x_dir=(-0.9280623468327948, -0.37242486543087544, 0), z_dir=(-0.37242486543087544, 0.9280623468327948, 0))) as fillet3_piece_12:
        with BuildLine():
            CenterArc((1 - FILLET3_R, FILLET3_R), FILLET3_R, 270, 90)
            Line((1 - FILLET3_R, 0), (1, 0))
            Line((1, 0), (1, FILLET3_R))
        make_face()
    revolve(axis=Axis((24, 10, 2), (0, 0, 1)), revolution_arc=158.134757045)
    with BuildSketch(Plane(origin=(24.122498999, 10, 2), x_dir=(0.9279423572134511, -0.37272373373471146, 0), z_dir=(0.37272373373471146, 0.9279423572134511, 0))) as fillet3_piece_13:
        with BuildLine():
            CenterArc((1 - FILLET3_R, -FILLET3_R), FILLET3_R, 0, 90)
            Line((1 - FILLET3_R, 0), (1, 0))
            Line((1, 0), (1, -FILLET3_R))
        make_face()
    revolve(axis=Axis((24.122498999, 10, 2), (0, 0, -1)), revolution_arc=119.434117166)
    with BuildSketch(Plane(origin=(-24.122498999, 10, 2), x_dir=(0.7806247497794805, -0.6250000000253787, 0), z_dir=(0.6250000000253787, 0.7806247497794805, 0))) as fillet3_piece_14:
        with BuildLine():
            CenterArc((1 - FILLET3_R, -FILLET3_R), FILLET3_R, 0, 90)
            Line((1 - FILLET3_R, 0), (1, 0))
            Line((1, 0), (1, -FILLET3_R))
        make_face()
    revolve(axis=Axis((-24.122498999, 10, 2), (0, 0, -1)), revolution_arc=119.434117166)
    with BuildSketch(Plane(origin=(-24, 10, 2), x_dir=(-1, 0, 0), z_dir=(0, 1, 0))) as fillet3_piece_15:
        with BuildLine():
            CenterArc((1 - FILLET3_R, FILLET3_R), FILLET3_R, 270, 90)
            Line((1 - FILLET3_R, 0), (1, 0))
            Line((1, 0), (1, FILLET3_R))
        make_face()
    revolve(axis=Axis((-24, 10, 2), (0, 0, 1)), revolution_arc=158.134757045)
    with BuildSketch(Plane(origin=(24, 26.757359313, 2), x_dir=(0.7071067811865476, 0.7071067811865476, 0), z_dir=(-0.7071067811865476, 0.7071067811865476, 0))) as fillet3_piece_16:
        with BuildLine():
            CenterArc((1 - FILLET3_R, -FILLET3_R), FILLET3_R, 0, 90)
            Line((1 - FILLET3_R, 0), (1, 0))
            Line((1, 0), (1, -FILLET3_R))
        make_face()
    revolve(axis=Axis((24, 26.757359313, 2), (0, 0, -1)), revolution_arc=45)

    # Sketch4 → Cut-Extrude3 (cut)
    with BuildSketch(Plane.XY.offset(5)):
        with Locations((-21, 7.5)):
            Circle(SKETCH4_R)
        with Locations((21, 7.5)):
            Circle(SKETCH4_R)
    extrude(amount=-CUT_EXTRUDE3_DEPTH, mode=Mode.SUBTRACT)

    # Sketch5 → Cut-Extrude4 (cut)
    with BuildSketch(Plane(origin=(0, 33, 0), x_dir=(1, 0, 0), z_dir=(0, 1, 0))):
        with Locations(Location((-18, -3, 0), (0, 0, 180))):
            Circle(SKETCH5_R)
        with Locations(Location((18, -3, 0), (0, 0, 123.55730975))):
            Circle(SKETCH5_R)
    extrude(amount=-CUT_EXTRUDE4_DEPTH, mode=Mode.SUBTRACT)

    # Sketch6 → Cut-Extrude5 (cut)
    with BuildSketch(Plane(origin=(27, 0, 0), x_dir=(0, 0, -1), z_dir=(1, 0, 0))):
        with Locations(Location((-3, 12, 0), (0, 0, 33.557309762))):
            Circle(SKETCH6_R)
    extrude(amount=-CUT_EXTRUDE5_DEPTH, mode=Mode.SUBTRACT)


solid = part.part
